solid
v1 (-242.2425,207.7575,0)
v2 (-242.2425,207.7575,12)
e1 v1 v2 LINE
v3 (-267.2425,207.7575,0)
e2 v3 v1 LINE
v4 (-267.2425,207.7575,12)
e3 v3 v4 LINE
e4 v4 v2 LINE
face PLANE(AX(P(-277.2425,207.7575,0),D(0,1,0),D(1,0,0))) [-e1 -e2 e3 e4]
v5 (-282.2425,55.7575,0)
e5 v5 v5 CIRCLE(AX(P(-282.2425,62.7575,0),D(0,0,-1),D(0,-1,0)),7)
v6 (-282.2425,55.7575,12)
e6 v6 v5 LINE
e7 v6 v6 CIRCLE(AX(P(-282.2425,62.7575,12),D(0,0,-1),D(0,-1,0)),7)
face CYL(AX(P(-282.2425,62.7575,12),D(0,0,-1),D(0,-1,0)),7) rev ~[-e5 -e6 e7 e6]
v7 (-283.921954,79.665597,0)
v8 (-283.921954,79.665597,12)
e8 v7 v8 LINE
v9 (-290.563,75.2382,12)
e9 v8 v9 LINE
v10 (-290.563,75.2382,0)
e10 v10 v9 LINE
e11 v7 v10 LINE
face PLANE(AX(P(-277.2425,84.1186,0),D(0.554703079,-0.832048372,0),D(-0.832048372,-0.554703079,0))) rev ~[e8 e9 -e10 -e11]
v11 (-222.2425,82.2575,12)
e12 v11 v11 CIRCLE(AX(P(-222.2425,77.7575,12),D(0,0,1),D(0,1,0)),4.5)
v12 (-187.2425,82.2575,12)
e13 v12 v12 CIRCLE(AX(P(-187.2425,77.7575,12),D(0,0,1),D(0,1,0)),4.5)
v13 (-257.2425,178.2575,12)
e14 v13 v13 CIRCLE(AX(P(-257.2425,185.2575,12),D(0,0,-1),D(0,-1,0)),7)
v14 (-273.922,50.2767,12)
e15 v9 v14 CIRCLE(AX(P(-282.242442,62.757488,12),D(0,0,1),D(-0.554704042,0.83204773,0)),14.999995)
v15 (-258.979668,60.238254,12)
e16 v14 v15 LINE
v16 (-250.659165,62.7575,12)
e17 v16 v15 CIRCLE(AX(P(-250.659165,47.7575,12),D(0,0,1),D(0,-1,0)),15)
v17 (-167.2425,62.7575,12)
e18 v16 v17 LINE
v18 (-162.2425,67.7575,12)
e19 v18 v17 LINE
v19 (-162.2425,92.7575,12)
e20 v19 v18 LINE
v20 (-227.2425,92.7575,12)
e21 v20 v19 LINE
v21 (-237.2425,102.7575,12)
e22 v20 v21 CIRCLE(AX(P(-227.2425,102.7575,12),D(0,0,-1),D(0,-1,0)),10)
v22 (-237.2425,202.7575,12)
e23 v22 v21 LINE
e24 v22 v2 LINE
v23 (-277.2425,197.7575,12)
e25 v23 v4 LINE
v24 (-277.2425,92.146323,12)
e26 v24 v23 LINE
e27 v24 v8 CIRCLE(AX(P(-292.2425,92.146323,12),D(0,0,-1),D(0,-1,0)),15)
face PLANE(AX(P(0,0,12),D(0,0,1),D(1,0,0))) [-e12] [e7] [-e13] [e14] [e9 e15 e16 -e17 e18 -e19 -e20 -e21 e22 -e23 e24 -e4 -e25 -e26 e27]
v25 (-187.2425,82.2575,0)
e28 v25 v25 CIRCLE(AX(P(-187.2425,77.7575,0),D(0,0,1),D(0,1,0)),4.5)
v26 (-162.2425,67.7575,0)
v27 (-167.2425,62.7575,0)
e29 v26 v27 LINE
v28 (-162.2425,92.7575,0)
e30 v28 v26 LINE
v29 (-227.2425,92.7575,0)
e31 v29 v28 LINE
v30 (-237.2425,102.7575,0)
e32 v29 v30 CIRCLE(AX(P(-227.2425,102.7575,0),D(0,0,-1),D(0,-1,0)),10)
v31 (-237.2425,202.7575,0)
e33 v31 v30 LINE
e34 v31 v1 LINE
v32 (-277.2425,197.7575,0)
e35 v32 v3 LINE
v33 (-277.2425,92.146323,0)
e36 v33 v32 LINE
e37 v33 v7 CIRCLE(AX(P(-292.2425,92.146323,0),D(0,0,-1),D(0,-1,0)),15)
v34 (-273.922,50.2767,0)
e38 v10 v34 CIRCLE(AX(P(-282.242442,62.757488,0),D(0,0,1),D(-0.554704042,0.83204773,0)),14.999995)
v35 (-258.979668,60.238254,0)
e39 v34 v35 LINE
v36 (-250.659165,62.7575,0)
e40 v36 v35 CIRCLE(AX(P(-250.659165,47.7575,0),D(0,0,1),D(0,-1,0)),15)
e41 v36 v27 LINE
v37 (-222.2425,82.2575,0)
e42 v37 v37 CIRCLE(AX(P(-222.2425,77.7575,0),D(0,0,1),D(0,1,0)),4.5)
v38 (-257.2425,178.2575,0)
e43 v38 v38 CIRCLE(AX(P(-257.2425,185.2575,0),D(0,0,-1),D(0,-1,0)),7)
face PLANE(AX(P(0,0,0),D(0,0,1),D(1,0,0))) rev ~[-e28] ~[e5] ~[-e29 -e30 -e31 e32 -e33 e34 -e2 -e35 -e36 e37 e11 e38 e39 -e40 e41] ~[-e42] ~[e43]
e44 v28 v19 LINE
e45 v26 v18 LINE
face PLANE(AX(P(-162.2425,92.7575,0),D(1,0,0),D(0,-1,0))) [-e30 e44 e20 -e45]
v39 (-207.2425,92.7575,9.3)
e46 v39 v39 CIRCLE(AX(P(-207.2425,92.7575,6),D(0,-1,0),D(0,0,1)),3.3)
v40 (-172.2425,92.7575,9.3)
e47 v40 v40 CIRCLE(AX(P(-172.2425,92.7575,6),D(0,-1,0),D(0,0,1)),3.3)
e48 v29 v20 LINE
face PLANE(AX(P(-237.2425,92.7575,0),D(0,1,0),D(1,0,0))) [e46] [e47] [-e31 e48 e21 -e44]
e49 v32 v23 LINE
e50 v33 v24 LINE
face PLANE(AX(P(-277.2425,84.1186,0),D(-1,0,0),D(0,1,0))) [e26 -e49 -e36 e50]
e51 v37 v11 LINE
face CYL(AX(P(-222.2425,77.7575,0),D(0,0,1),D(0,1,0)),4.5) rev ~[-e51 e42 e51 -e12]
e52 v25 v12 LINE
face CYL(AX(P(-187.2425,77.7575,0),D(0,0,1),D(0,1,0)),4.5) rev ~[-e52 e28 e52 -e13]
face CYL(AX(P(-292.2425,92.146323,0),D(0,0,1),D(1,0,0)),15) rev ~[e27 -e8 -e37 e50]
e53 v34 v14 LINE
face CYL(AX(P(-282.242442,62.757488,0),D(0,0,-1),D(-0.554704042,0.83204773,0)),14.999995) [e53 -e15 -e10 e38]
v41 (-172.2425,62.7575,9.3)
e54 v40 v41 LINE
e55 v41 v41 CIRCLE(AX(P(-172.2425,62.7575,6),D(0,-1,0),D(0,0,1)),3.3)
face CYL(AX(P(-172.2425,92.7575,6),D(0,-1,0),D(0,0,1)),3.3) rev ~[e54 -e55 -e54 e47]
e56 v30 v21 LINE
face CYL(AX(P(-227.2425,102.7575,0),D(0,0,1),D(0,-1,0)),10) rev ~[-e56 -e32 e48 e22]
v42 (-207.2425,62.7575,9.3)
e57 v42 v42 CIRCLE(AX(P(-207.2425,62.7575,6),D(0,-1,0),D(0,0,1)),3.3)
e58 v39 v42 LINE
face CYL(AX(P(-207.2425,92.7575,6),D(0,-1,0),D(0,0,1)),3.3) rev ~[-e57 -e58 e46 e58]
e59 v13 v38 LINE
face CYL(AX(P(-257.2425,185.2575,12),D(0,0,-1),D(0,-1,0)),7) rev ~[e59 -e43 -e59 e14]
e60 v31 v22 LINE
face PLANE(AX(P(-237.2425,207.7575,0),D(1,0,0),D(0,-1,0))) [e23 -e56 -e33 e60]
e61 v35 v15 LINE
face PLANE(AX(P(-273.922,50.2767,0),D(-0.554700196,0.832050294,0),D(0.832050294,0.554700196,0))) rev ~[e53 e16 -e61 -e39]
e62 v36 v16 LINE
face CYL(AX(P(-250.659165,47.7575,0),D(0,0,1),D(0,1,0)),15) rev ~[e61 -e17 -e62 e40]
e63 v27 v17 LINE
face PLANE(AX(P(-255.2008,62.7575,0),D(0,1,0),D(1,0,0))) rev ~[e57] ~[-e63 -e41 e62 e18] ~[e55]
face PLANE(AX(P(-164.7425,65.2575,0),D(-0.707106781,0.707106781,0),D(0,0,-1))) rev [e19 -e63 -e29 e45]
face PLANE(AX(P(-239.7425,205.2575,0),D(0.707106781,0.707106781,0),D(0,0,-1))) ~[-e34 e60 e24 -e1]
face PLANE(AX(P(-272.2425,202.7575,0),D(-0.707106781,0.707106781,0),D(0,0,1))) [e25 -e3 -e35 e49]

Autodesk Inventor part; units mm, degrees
ref_plane "YZ Plane" through (0, 0, 0) normal (1, 0, 0) x (0, 1, 0)
ref_plane "XZ Plane" through (0, 0, 0) normal (0, 1, 0) x (-1, 0, 0)
sketch "スケッチ2" plane through (0, 0, 0) normal (0, 0, 1) x (1, 0, 0)
  line L0 (-162.2425, 92.7575) -> (-162.2425, 62.7575)
  line L1 (-277.2425, 207.7575) -> (-237.2425, 207.7575)
  arc A0 (-290.563, 75.2382) -> (-273.922, 50.2767) centre (-282.2425, 62.7575) ccw
  line L2 (-277.2425, 84.1186) -> (-290.563, 75.2382)
  line L3 (-277.2425, 84.1186) -> (-277.2425, 207.7575)
  line L4 (-237.2425, 207.7575) -> (-237.2425, 92.7575)
  line L5 (-237.2425, 92.7575) -> (-162.2425, 92.7575)
  line L6 (-273.922, 50.2767) -> (-255.2008, 62.7575)
  line L7 (-255.2008, 62.7575) -> (-162.2425, 62.7575)
  line L8 (-282.2425, 62.7575) -> (-237.2425, 92.7575) construction
  point P0 (0, 0)
  dimension "d18" = 120
  dimension "d21" = 15
  dimension "d116" = 5
  dimension "d154" = 15
  dimension "d155" = 145
  dimension "d175" = 30
  dimension "d181" = 90
  dimension "d182" = 40
extrude "押し出し2" add sketch "スケッチ2" along normal blind 12
sketch "スケッチ3" plane through (0, 0, 12) normal (0, 0, 1) x (1, 0, 0)
  arc A0 (-290.563, 75.2382) -> (-282.2425, 47.7575) centre (-282.2425, 62.7575) ccw projected
  line L0 (-267.2425, 207.7575) -> (-237.2425, 207.7575) projected
  point P0 (-257.2425, 185.2575)
  dimension "d16" = 25
  dimension "d153" = 22.5
hole "穴1" at (-257.2425, 185.2575, 12) at (-282.2425, 62.7575, 12) direction (0, 0, -1) diameter 14 end through all
sketch "スケッチ10" plane through (-237.2425, 92.7575, 0) normal (0, 1, 0) x (1, 0, 0)
  line L0 (75, 0) -> (75, -12)
  line L1 (0, -12) -> (75, -12)
  line L2 (75, 0) -> (0, 0) projected
  point P0 (65, -6)
  point P1 (30, -6)
  dimension "d119" = 35
  dimension "d156" = 10
  dimension "d157" = 6
hole "穴8" at (-172.2425, 92.7575, 6) at (-207.2425, 92.7575, 6) direction (0, -1, 0) diameter 6.6 end through all
chamfer "面取り1" distance 5 angle 45 1 edges at (-162.2425, 62.7575, 6)
fillet "フィレット1" radius 10 1 edges at (-237.2425, 92.7575, 6)
chamfer "面取り2" distance 5 angle 45 1 edges at (-237.2425, 207.7575, 6)
ref_plane "Work Plane2" through (-255.2008, 77.7575, 0) normal (0, -1, 0) x (1, 0, 0)
sketch "Sketch18" plane through (0, 0, 0) normal (0, 0, -1) x (-1, 0, 0)
  line L0 (162.2425, 67.7575) -> (162.2425, 92.7575) projected
  line L1 (324.2425, 77.7575) -> (135.2425, 77.7575) construction
  point P0 (187.2425, 77.7575)
  dimension "d165" = 25
hole "Hole13" at (-187.2425, 77.7575, 0) direction (0, 0, 1) diameter 9 end through all
pattern_linear "Rectangular Pattern1" count 2 spacing 35 along (-1, 0, 0) of "Hole13"
fillet "Fillet2" radius 15 2 edges at (-255.2008, 62.7575, 6) (-277.2425, 84.1186, 6)
chamfer "Chamfer3" distance 10 angle 45 1 edges at (-277.2425, 207.7575, 6)
properties part number "Support Bracket" material "STEEL - MILD"
